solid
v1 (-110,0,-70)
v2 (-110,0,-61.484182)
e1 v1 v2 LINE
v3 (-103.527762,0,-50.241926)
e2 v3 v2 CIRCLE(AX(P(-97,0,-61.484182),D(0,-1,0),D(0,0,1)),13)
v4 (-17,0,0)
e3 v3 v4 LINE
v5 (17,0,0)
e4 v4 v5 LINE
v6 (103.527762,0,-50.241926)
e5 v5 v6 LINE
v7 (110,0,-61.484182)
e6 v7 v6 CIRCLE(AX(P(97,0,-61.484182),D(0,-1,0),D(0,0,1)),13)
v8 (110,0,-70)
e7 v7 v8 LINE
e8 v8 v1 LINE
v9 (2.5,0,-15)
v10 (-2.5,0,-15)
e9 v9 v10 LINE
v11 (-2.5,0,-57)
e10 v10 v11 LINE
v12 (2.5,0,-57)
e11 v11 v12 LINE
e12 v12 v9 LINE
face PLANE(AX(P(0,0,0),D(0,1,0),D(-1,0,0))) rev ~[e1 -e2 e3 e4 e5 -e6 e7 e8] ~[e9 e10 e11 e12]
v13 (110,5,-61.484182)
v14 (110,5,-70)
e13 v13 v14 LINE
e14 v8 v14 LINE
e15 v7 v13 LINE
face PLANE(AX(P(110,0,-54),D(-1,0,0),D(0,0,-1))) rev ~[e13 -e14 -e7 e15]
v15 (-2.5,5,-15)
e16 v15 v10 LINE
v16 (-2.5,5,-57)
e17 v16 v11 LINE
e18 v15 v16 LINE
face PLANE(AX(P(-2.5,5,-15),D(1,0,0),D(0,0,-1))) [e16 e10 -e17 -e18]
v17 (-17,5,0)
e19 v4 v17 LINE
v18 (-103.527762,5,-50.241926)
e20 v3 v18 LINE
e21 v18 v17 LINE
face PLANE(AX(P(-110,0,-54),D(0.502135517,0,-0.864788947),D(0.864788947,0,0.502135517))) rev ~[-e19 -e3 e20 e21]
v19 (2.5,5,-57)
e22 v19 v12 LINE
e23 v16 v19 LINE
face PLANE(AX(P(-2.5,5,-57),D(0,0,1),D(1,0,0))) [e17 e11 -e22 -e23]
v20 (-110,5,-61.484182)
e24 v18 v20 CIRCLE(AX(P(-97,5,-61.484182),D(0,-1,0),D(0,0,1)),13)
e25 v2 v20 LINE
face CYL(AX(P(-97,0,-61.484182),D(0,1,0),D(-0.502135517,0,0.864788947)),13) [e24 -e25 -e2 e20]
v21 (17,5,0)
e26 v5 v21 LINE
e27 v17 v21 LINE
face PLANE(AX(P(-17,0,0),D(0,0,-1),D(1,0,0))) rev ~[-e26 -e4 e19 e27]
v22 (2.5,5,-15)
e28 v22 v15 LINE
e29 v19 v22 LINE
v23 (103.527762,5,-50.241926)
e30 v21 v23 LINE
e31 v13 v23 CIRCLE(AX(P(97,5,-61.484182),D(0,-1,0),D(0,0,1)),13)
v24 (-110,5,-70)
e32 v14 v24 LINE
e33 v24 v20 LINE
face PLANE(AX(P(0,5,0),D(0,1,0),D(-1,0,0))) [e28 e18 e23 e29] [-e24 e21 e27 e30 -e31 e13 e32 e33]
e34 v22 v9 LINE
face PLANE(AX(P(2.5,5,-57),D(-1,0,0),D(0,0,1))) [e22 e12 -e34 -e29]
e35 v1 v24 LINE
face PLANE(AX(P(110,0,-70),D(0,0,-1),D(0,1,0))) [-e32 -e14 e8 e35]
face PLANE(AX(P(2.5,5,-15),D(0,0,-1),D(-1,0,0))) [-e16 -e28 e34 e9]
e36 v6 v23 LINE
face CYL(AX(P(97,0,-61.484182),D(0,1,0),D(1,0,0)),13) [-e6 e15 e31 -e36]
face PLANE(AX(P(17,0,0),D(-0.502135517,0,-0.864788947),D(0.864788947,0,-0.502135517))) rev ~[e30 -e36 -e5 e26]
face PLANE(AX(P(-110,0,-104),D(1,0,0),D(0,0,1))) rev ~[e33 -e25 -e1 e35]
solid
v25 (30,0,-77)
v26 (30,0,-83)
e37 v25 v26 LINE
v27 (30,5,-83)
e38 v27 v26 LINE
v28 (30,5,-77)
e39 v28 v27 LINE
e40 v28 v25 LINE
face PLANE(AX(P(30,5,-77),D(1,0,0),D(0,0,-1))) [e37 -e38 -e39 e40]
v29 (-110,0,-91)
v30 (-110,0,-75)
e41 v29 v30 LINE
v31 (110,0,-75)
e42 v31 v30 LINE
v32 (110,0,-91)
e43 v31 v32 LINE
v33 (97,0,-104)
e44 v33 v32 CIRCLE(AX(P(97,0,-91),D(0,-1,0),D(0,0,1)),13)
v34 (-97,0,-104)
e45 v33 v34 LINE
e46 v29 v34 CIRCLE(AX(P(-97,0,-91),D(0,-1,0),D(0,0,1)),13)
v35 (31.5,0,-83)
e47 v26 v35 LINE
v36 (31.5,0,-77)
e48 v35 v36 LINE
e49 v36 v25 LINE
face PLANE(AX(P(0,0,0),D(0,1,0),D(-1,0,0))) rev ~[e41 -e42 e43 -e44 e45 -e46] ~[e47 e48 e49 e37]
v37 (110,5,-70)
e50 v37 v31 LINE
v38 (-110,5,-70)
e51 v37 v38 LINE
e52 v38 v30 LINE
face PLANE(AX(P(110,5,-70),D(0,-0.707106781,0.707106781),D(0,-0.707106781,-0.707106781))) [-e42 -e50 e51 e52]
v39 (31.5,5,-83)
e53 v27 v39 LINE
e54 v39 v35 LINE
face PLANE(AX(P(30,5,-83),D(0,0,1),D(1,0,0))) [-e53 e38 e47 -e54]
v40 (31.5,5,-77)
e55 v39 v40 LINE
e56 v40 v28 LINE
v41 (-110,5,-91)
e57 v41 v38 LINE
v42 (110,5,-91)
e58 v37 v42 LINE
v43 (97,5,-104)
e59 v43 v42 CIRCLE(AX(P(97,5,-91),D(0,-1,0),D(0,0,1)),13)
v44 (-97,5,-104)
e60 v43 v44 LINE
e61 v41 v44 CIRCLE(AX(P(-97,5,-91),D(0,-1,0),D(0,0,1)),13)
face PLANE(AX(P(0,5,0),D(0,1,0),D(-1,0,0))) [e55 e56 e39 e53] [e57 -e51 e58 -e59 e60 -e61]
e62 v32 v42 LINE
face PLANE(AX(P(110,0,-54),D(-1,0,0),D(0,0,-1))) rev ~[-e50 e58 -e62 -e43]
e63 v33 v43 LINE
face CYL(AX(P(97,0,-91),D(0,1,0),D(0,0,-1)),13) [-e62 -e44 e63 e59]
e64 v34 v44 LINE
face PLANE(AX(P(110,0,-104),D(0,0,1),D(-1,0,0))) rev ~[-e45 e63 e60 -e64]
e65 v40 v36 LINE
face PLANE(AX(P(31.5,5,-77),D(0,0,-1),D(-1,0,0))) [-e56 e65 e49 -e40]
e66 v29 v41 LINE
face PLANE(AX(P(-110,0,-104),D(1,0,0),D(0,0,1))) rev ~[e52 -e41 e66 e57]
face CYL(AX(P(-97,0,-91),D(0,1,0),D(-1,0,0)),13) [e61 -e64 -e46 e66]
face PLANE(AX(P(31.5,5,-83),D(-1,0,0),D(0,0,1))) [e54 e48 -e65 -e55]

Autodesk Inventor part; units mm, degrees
ref_plane "YZ Plane" through (0, 0, 0) normal (1, 0, 0) x (0, 1, 0)
ref_plane "XZ Plane" through (0, 0, 0) normal (0, 1, 0) x (-1, 0, 0)
sketch "Sketch1" plane through (0, 0, 0) normal (0, 1, 0) x (-1, 0, 0)
  line L0 (17, 0) -> (-17, 0)
  line L1 (-17, 0) -> (-110, -54)
  line L2 (-110, -54) -> (-110, -104)
  line L3 (-110, -104) -> (110, -104)
  line L4 (110, -104) -> (110, -54)
  line L5 (110, -54) -> (17, 0)
  point P0 (0, 0)
  dimension "d0" = 220
  dimension "d1" = 104
  dimension "d4" = 34
  dimension "d5" = 17
  dimension "d8" = 50
extrude "Extrusion1" add sketch "Sketch1" along normal blind 5
fillet "Fillet1" radius 13 4 edges at (-110, 2.5, -104) (110, 2.5, -104) (110, 2.5, -54) (-110, 2.5, -54)
sketch "Sketch2" plane through (0, 5, 0) normal (0, 1, 0) x (1, 0, 0)
  line L0 (-2.5, 57) -> (2.5, 57)
  line L1 (2.5, 57) -> (2.5, 15)
  line L2 (2.5, 15) -> (-2.5, 15)
  line L3 (-2.5, 15) -> (-2.5, 57)
  line L4 (-17, 0) -> (17, 0) projected
  line L5 (0, 0) -> (0, 5.9435) construction
  line L6 (30, 83) -> (31.5, 83)
  line L7 (31.5, 83) -> (31.5, 77)
  line L8 (31.5, 77) -> (30, 77)
  line L9 (30, 77) -> (30, 83)
  line L10 (110, 61.4842) -> (110, 91) projected
  line L11 (97, 104) -> (-97, 104) projected
  point P0 (0, 0)
  point P1 (0, 15)
  dimension "d12" = 5
  dimension "d13" = 42
  dimension "d14" = 15
  dimension "d28" = 1.5
  dimension "d29" = 78.5
  dimension "d30" = 21
  dimension "d31" = 6
extrude "Extrusion2" cut sketch "Sketch2" against normal through all
sketch "Sketch3" plane through (110, 0, -61.4842) normal (1, 0, 0) x (0, 0, -1)
  line L0 (42.5158, 0) -> (42.5158, 5) projected
  line L1 (0, 5) -> (29.5158, 5) projected
  line L2 (29.5158, 0) -> (0, 0) projected
  line L3 (29.5158, 5) -> (0, 5) projected
  line L4 (8.5158, 0) -> (8.5158, 5)
  line L5 (8.5158, 0) -> (13.5158, 0)
  line L6 (0, 0) -> (29.5158, 0) projected
  line L7 (8.5158, 5) -> (13.5158, 0)
  point P0 (-61.4842, 0)
  dimension "d26" = 45
  dimension "d27" = 34
extrude "Extrusion3" cut sketch "Sketch3" against normal through all
ref_plane "Work Plane1" through (110, 0, -70) normal (0, 0, -1) x (-1, 0, 0)
split body "Split1" result two bodies by plane through (110, 0, -70) normal (0, 0, -1) first body at (-59, 4.5, -83.6667)
equation "\"d5\" = 0.5 * d4"
equation "\"d9\" = Thickness"
equation "\"d12\" = Thickness"
equation "\"d23\" = Thickness"
equation "\"Thickness\" = 5"
properties part number "horizontal_stabilizer" material "Foam board"
